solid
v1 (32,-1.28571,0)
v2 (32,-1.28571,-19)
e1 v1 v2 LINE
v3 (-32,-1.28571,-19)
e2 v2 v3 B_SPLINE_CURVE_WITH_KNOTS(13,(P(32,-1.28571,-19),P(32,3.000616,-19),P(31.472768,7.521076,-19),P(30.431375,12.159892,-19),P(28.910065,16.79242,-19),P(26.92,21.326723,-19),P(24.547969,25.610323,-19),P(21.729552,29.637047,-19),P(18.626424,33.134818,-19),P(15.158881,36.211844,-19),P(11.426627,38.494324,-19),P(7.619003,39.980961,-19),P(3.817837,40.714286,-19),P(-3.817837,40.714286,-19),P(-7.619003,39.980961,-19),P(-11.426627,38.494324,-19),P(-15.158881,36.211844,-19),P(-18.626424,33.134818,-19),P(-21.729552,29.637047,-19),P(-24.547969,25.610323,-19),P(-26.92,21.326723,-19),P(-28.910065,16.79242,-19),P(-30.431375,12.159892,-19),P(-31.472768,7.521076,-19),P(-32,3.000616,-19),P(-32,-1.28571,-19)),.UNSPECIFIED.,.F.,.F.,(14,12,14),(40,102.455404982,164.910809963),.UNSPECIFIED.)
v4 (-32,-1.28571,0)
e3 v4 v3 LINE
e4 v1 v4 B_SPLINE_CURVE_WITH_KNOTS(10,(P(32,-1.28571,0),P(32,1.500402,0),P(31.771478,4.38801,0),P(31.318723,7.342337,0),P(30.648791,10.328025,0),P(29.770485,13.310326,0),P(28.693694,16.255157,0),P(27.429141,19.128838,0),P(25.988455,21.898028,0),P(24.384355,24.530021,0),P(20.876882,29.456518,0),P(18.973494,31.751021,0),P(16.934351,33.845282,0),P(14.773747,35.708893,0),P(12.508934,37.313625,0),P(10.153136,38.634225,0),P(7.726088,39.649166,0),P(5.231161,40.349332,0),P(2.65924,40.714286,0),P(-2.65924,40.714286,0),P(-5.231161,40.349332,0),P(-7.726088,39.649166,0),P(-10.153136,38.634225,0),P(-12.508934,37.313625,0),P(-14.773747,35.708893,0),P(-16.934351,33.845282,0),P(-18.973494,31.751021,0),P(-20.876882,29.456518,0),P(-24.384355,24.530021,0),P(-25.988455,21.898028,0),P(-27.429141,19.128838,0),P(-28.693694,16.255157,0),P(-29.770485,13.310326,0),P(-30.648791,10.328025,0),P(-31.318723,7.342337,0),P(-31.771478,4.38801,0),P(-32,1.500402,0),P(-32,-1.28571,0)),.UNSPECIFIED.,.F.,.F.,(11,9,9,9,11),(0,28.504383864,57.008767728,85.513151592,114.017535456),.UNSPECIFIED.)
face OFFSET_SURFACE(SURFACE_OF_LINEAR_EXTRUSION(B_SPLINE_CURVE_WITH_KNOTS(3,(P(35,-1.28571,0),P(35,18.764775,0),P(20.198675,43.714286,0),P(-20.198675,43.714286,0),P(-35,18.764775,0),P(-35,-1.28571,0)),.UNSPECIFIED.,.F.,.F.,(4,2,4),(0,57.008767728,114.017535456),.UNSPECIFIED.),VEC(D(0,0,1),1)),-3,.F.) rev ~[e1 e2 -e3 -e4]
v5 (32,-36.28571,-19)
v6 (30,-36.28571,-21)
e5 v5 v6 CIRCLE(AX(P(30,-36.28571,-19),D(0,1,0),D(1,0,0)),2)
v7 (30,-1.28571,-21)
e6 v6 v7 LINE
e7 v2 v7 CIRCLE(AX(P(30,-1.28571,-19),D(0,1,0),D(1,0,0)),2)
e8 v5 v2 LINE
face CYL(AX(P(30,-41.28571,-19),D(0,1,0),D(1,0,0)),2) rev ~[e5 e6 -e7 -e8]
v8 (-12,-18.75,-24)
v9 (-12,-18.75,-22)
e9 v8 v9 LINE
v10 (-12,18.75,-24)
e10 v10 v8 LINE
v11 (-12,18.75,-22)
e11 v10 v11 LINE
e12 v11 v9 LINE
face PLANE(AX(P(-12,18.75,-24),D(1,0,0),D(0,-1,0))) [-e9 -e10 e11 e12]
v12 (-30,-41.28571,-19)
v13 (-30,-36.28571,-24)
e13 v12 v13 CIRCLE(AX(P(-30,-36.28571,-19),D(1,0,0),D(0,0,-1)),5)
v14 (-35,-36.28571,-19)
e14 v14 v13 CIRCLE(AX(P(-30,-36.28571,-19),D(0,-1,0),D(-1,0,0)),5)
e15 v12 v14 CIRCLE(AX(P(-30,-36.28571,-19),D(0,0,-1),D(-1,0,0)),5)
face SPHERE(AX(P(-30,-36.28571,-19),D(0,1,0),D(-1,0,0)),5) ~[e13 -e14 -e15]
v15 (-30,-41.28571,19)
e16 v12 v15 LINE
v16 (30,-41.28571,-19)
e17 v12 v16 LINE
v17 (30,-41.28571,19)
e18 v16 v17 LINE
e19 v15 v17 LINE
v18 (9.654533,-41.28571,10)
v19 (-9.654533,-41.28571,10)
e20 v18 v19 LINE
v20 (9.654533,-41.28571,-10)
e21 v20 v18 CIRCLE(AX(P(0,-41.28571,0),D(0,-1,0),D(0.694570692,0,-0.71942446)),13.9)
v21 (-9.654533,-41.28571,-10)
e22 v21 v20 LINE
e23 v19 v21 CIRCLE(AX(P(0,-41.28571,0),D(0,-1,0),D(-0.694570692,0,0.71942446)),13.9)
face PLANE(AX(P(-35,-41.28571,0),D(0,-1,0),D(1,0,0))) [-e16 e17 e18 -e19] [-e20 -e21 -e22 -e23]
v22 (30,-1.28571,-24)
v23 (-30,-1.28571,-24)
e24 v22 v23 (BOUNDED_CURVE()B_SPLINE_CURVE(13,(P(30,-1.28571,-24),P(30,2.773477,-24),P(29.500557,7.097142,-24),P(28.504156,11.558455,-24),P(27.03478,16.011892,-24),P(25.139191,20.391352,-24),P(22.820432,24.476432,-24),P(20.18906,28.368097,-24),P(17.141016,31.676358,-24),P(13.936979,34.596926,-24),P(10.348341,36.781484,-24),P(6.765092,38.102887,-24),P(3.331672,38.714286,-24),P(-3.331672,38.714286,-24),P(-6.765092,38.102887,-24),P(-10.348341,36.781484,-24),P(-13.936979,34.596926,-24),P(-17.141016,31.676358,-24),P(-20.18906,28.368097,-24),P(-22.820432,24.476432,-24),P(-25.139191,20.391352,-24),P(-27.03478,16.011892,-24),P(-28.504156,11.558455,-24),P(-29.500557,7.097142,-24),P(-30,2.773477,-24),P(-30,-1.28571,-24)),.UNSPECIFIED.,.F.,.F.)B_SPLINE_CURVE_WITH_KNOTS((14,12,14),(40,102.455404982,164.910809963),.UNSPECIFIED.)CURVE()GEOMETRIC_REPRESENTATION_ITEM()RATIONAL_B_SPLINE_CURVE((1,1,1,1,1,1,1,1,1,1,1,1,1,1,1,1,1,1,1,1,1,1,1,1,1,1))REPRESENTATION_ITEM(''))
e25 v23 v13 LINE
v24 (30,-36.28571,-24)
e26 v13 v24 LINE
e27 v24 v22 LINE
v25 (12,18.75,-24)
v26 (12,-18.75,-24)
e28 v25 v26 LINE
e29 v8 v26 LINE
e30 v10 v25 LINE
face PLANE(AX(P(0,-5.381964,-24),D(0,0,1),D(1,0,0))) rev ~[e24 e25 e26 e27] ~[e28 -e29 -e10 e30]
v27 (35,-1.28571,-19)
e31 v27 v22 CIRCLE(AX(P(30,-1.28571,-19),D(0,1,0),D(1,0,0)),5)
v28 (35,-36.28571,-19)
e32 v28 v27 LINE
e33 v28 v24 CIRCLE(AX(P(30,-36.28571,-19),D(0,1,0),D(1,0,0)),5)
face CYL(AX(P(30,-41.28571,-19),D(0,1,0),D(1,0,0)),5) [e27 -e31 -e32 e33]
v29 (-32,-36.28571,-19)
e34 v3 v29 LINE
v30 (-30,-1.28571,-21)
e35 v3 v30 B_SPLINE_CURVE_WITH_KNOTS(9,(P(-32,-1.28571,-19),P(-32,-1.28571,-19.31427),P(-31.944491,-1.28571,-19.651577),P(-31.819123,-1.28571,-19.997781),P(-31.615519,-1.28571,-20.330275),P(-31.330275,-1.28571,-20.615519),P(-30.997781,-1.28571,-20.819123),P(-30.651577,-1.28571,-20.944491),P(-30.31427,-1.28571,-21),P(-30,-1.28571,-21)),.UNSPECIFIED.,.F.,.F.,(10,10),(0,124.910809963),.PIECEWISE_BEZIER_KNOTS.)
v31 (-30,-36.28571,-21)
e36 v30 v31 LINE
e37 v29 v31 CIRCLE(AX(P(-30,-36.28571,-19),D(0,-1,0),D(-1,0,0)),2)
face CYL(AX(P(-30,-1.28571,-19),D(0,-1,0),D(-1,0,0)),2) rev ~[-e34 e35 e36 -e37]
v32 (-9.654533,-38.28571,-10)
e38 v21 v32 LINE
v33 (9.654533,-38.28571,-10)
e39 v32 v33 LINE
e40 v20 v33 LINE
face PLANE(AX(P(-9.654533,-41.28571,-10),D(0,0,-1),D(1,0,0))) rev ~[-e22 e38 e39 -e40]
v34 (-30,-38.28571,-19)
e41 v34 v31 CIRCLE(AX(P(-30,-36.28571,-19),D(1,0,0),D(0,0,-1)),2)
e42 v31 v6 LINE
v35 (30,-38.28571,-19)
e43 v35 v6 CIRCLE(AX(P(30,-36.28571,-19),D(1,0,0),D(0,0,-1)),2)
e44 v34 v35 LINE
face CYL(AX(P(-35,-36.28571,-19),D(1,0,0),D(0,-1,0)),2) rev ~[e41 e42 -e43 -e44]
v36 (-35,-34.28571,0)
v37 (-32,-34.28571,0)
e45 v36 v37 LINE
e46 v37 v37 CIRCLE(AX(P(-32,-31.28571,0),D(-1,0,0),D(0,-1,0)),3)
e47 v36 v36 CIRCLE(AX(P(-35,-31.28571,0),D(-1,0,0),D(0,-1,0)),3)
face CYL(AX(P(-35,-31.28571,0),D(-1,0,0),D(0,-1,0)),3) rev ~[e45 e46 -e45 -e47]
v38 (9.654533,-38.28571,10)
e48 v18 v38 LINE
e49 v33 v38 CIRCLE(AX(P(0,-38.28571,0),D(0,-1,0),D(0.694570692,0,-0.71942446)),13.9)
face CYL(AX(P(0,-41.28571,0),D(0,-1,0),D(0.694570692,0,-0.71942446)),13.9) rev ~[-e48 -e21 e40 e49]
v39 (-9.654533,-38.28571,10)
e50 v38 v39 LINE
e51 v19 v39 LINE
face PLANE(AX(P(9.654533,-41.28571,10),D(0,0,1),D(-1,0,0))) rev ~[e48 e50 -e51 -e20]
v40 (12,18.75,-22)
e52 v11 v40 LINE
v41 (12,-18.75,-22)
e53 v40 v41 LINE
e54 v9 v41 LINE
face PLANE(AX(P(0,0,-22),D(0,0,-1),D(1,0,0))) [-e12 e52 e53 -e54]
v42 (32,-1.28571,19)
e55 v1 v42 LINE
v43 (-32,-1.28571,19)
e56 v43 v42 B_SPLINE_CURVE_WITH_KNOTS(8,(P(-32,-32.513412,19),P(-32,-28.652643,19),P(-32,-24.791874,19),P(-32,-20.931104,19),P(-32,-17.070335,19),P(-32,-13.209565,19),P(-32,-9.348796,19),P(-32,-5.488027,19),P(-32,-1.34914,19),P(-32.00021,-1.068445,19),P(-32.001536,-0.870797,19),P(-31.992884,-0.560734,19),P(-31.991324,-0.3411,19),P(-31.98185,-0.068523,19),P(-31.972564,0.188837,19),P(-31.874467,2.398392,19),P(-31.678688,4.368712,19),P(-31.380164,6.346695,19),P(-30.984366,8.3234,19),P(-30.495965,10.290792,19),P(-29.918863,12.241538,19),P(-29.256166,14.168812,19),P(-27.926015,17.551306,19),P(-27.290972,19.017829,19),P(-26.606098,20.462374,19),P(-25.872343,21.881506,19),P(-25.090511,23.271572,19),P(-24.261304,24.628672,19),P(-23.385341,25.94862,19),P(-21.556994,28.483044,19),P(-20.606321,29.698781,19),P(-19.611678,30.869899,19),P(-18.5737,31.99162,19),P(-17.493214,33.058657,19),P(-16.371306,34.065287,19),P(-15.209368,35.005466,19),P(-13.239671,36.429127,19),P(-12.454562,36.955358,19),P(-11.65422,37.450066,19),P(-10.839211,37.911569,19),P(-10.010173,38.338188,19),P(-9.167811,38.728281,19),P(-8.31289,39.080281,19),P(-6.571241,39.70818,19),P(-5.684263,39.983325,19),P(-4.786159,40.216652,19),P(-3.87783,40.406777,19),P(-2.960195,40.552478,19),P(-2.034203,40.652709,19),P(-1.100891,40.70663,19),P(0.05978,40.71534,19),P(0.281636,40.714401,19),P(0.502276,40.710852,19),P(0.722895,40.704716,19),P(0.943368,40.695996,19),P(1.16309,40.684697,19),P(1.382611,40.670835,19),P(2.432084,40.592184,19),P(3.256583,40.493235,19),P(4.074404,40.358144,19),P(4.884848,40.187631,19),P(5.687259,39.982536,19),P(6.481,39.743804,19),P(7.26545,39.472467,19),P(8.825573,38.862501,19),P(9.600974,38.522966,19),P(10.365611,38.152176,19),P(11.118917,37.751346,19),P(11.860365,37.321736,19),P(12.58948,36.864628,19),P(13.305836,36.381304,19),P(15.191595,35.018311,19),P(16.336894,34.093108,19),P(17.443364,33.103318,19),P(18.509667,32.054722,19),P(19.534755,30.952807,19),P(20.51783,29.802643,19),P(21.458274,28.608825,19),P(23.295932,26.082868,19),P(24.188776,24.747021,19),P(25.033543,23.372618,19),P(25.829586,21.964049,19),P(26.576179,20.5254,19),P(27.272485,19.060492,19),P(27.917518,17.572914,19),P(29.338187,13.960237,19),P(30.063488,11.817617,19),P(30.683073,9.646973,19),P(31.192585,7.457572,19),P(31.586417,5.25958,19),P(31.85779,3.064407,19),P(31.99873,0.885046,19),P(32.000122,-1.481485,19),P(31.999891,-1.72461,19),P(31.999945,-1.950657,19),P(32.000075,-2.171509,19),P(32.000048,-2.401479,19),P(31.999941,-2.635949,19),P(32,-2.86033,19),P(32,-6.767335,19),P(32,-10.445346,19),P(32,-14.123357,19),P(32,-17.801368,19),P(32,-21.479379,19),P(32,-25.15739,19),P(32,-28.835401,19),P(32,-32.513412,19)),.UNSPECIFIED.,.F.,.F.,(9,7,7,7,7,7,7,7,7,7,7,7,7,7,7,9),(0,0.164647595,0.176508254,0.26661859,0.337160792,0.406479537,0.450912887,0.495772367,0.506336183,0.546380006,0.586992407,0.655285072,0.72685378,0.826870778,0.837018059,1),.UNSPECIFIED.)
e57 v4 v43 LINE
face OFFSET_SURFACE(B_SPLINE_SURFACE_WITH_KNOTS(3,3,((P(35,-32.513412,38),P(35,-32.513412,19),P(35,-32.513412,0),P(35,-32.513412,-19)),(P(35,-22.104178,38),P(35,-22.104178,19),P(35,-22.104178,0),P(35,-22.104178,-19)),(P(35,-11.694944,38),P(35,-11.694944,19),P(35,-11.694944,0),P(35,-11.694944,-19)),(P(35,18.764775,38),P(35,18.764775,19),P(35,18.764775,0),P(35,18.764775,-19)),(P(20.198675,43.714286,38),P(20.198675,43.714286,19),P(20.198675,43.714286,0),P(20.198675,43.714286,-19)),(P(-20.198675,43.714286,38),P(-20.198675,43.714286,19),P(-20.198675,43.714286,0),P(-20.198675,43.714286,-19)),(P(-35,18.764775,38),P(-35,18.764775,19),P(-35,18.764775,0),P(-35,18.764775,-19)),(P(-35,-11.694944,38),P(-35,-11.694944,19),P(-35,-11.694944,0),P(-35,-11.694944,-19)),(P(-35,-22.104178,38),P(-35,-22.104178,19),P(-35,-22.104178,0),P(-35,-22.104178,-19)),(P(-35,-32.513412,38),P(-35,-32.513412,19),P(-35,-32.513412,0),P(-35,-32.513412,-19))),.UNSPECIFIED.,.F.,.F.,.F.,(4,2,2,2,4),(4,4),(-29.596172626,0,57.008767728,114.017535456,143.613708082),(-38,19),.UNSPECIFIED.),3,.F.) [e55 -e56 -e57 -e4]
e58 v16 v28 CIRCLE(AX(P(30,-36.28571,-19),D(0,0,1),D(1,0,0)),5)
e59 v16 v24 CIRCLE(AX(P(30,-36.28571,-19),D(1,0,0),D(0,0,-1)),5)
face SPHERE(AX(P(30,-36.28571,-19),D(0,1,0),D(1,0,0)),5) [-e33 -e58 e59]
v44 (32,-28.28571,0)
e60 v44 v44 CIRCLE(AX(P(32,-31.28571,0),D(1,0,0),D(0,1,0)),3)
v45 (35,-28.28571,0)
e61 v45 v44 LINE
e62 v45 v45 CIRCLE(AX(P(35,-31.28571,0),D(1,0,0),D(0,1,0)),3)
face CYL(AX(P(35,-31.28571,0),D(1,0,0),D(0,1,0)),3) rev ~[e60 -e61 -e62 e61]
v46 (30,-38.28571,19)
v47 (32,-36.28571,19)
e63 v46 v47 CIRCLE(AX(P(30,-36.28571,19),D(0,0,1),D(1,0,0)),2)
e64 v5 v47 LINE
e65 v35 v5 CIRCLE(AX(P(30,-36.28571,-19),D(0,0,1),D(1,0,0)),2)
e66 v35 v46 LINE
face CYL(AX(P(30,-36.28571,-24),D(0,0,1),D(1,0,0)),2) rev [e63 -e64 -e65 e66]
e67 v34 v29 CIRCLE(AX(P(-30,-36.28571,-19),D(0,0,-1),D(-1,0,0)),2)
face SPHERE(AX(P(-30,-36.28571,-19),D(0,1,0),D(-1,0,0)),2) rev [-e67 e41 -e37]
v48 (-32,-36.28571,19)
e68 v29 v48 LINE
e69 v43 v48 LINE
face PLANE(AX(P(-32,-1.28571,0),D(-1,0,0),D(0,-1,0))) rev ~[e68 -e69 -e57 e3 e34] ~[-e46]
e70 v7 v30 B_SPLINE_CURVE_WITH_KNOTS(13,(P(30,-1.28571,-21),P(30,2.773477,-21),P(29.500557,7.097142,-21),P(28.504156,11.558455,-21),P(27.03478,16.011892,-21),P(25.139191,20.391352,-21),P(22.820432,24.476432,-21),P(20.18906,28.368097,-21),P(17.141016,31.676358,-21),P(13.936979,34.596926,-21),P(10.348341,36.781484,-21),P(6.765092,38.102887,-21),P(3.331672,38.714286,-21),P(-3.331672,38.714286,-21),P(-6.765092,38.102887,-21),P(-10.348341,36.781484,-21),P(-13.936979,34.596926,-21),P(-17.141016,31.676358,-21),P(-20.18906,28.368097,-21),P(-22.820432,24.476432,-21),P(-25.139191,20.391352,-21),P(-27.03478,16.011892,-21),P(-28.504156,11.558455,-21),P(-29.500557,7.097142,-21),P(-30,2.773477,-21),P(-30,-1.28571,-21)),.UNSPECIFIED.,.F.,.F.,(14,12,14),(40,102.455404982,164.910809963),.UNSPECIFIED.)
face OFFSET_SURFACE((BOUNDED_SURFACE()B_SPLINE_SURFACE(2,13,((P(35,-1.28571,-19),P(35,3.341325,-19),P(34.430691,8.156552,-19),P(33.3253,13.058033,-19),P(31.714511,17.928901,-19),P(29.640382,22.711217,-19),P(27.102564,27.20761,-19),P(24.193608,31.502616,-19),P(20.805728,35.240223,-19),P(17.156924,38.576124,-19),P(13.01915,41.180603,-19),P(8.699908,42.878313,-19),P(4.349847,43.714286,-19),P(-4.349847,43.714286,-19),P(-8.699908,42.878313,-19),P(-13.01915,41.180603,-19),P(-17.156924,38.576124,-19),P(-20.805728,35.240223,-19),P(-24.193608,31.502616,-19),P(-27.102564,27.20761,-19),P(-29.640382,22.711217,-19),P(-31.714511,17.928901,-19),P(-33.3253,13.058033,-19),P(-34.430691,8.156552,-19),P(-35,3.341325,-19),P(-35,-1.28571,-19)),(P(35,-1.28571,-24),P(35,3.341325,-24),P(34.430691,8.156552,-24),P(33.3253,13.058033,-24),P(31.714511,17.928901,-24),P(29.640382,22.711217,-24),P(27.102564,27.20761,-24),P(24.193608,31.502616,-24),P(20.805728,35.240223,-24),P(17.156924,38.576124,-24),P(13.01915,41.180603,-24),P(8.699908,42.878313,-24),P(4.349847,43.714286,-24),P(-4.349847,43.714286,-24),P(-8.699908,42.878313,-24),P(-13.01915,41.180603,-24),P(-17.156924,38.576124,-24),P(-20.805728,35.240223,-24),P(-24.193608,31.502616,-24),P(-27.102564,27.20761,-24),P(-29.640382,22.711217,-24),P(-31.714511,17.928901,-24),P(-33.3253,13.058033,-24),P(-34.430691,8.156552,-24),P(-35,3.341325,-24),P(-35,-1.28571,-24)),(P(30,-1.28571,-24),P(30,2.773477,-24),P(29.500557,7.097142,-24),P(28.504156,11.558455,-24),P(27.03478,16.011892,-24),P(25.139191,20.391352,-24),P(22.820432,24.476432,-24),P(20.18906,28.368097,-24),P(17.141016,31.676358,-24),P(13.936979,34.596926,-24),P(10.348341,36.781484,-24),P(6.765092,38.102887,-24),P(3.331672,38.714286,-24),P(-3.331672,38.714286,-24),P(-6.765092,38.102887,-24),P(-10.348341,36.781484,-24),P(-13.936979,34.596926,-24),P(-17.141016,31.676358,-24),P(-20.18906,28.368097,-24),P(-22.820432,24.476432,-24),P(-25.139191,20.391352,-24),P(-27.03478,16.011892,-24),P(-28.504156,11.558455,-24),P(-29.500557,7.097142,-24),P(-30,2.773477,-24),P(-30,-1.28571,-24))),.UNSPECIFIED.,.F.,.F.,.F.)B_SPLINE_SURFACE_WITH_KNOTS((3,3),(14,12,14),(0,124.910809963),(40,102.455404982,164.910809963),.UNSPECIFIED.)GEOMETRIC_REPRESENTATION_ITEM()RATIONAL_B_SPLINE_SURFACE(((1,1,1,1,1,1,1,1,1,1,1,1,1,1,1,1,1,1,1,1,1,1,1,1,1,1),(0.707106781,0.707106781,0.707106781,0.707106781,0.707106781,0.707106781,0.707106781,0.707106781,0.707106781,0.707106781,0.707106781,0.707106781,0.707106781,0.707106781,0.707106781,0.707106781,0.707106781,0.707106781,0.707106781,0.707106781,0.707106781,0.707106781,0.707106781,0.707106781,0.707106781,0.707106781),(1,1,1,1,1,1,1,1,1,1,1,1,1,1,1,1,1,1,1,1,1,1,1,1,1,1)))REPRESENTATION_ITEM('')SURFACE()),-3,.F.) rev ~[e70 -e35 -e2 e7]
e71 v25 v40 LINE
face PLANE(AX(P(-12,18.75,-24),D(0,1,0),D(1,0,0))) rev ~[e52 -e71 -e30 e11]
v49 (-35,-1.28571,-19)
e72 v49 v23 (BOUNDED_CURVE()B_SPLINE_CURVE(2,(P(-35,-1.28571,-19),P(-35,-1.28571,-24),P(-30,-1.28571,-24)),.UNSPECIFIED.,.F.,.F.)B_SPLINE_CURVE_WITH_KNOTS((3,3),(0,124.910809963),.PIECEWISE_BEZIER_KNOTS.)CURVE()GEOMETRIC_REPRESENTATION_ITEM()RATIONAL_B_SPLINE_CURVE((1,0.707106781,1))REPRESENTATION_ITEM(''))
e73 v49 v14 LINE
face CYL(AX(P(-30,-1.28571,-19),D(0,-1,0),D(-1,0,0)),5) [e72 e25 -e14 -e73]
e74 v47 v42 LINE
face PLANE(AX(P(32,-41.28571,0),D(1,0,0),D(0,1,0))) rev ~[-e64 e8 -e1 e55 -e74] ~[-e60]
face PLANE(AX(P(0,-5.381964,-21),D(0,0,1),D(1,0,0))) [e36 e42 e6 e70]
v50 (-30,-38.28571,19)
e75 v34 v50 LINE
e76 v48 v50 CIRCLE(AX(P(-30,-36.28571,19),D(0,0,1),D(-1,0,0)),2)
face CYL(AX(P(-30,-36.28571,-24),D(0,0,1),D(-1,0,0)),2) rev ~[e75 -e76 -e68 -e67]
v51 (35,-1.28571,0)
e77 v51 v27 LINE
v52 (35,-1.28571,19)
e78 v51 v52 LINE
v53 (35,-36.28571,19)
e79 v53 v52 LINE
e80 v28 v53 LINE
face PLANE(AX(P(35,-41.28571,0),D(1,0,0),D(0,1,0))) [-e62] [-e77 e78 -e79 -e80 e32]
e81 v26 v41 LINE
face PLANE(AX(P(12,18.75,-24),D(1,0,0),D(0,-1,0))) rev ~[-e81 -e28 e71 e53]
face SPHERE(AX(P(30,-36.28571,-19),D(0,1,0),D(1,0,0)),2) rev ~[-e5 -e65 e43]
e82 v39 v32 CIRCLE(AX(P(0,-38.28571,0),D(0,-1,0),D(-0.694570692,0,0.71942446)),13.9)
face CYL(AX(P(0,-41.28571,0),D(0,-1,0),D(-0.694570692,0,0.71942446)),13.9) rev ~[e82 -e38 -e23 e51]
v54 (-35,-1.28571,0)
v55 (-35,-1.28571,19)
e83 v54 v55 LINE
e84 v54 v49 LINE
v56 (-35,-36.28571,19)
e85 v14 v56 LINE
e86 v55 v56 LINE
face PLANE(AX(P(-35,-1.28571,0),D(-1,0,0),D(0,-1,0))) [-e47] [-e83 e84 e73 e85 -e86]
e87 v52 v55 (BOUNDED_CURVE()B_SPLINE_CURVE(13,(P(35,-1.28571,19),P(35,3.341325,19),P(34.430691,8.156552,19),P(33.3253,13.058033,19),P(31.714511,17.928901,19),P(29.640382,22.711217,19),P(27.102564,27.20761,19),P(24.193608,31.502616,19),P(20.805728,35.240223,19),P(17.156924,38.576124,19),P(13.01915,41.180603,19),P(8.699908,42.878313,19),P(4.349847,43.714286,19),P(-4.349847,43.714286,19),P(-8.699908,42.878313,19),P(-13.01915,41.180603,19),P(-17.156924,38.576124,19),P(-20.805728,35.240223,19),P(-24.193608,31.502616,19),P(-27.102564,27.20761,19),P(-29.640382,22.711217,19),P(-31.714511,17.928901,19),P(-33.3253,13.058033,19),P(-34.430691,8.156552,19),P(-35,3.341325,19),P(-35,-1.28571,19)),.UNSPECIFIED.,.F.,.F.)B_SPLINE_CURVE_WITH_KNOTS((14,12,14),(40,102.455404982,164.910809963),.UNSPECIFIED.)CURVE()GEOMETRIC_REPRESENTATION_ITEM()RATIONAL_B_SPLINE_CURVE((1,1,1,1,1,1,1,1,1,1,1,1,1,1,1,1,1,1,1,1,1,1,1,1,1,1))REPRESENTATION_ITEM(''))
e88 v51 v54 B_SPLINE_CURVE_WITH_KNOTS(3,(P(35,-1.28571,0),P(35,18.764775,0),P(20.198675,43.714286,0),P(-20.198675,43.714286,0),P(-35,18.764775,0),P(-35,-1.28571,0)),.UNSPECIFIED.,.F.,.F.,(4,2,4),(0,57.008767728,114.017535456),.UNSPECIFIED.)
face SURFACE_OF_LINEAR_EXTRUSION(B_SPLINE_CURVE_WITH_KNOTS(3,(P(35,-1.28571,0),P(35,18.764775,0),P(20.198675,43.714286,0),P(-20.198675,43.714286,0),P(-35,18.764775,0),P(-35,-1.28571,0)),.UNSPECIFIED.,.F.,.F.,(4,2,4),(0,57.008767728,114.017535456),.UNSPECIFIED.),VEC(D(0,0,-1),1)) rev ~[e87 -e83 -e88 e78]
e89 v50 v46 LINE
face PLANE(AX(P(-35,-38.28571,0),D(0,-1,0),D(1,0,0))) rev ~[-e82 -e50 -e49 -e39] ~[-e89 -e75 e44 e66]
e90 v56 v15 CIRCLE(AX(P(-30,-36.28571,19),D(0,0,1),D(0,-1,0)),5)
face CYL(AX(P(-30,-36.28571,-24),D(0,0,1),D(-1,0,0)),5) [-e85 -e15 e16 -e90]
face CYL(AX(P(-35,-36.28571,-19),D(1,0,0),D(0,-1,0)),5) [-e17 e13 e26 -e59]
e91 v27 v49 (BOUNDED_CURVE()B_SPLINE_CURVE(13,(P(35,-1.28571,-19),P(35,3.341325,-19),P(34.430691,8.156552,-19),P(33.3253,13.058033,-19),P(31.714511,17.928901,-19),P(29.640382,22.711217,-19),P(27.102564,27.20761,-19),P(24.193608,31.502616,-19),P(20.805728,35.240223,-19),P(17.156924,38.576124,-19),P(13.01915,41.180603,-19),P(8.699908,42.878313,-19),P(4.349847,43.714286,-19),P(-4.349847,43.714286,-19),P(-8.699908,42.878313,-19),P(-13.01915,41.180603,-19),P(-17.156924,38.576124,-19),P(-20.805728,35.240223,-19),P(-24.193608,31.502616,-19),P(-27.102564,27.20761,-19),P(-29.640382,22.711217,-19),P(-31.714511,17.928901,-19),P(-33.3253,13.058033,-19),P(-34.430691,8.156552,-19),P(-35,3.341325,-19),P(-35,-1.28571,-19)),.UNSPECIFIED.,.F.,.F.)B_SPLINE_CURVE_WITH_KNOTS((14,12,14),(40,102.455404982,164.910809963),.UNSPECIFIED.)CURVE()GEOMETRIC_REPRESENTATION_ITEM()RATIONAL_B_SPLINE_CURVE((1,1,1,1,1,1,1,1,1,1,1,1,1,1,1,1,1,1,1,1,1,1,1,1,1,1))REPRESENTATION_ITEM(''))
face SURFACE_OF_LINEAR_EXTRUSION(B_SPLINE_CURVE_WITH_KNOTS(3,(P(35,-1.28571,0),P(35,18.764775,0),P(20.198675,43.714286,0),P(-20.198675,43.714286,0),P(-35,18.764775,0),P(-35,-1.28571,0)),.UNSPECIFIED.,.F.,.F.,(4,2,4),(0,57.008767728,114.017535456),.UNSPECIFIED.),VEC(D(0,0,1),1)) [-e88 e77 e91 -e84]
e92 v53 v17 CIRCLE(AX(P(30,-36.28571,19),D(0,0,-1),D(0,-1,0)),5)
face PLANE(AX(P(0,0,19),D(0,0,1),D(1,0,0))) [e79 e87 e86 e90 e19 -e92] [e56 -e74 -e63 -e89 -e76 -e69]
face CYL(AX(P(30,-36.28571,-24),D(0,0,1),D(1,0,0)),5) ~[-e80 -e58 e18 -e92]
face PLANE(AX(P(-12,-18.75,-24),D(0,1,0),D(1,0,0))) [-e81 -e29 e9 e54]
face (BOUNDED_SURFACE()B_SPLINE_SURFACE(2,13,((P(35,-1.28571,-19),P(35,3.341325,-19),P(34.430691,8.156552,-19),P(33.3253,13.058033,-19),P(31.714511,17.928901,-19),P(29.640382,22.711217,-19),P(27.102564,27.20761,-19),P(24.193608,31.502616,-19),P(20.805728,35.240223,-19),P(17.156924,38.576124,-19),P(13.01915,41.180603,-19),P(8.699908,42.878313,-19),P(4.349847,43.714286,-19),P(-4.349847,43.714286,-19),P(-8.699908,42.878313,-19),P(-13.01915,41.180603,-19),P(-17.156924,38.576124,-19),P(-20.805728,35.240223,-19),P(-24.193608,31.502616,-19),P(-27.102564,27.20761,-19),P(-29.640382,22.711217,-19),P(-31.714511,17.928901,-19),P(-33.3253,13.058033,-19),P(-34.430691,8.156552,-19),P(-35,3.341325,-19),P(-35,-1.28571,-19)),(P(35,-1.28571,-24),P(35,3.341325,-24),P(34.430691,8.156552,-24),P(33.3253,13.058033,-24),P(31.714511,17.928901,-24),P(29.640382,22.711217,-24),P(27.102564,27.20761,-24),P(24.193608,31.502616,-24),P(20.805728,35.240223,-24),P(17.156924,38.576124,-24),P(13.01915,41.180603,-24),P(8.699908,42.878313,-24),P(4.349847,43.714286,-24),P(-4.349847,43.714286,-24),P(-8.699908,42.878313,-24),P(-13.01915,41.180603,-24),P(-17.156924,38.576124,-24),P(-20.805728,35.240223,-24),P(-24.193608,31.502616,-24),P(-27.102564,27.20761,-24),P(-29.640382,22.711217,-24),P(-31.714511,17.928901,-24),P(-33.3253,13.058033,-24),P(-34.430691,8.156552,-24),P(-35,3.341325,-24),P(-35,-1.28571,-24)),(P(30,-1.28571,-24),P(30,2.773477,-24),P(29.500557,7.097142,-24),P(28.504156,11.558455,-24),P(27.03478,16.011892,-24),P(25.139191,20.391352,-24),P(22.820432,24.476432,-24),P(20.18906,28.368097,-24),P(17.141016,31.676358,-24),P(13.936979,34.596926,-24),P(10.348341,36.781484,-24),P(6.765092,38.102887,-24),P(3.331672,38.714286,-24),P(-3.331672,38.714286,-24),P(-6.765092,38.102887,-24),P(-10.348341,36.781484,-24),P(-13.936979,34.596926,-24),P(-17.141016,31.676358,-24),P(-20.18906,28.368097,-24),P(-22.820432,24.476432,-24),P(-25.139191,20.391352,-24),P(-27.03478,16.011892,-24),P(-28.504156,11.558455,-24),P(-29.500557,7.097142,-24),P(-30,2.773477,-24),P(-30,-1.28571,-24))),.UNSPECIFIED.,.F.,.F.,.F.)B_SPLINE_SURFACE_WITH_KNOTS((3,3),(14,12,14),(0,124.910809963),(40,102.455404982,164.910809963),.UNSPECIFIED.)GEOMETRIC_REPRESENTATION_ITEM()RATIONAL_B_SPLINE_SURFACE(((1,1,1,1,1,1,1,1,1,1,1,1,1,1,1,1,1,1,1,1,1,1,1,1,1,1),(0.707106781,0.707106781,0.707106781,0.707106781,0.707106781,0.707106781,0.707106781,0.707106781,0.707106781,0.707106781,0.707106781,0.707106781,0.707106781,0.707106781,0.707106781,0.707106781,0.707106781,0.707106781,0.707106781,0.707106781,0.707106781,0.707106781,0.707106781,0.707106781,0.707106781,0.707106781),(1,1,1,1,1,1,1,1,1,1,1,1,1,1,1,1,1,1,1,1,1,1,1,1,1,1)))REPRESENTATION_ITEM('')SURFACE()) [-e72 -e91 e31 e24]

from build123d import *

# Parameters (mm, degrees)
F1_DEPTH  = 24
F4_R      = 5
F5_W      = 91.2617743015
F5_H      = 146.8465328217
F6_DEPTH  = 5
F7_T      = -3
F9_W      = 24
F9_H      = 37.5
F10_DEPTH = 2
F11_DEPTH = 3
F13_R     = 3
F15_DEPTH = 3
F14_R     = 3
F16_DEPTH = 3


with BuildPart() as f1:
    # F0 (on Top) → F1 (new body, symmetric)
    with BuildSketch(Plane.XY):
        with BuildLine():
            Line((-35, -1.2857098173), (-35, -41.2857098173))
            Line((-35, -41.2857098173), (35, -41.2857098173))
            Line((35, -41.2857098173), (35, -1.2857098173))
            add(Edge.make_bspline(
                [(0, 43.7142857143), (20.1986748725, 43.7142857143), (35, 18.7647750933), (35, -1.2857098173)],
                knots=[0, 0, 0, 0, 57.0087677278, 57.0087677278, 57.0087677278, 57.0087677278], degree=3))
            add(Edge.make_bspline(
                [(0, 43.7142857143), (-20.1986748725, 43.7142857143), (-35, 18.7647750933), (-35, -1.2857098173)],
                knots=[0, 0, 0, 0, 57.0087677278, 57.0087677278, 57.0087677278, 57.0087677278], degree=3))
        make_face()
    extrude(amount=F1_DEPTH, both=True)

    # F4
    f4_edges = [f1.edges().sort_by_distance(p)[0] for p in [
        (-35, -21.28571, -24),
        (-25.571688, 28.021772, -24),
        (0, -41.28571, 24),
        (-35, -21.28571, 24),
        (-35, -41.28571, 0),
        (35, -41.28571, 0),
        (0, -41.28571, -24),
    ]]
    fillet(f4_edges, radius=F4_R)

    # F5 (on face) → F6 (cut)
    with BuildSketch(Plane.XY.offset(24)):
        Rectangle(F5_W, F5_H)
    extrude(amount=-F6_DEPTH, mode=Mode.SUBTRACT)

    # F7
    f7_openings = [f1.faces().sort_by_distance(p)[0] for p in [
        (0, -3.179771, 19),
    ]]
    offset(amount=F7_T, openings=f7_openings, kind=Kind.INTERSECTION)

    # F9 (on face) → F10 (cut)
    with BuildSketch(Plane(origin=(0, 0, -24), x_dir=(1, 0, 0), z_dir=(0, 0, -1))):
        Rectangle(F9_W, F9_H)
    extrude(amount=-F10_DEPTH, mode=Mode.SUBTRACT)

    # F8 (on face) → F11 (cut)
    with BuildSketch(Plane.XZ.offset(41.2857098173)):
        with BuildLine():
            Line((9.6545326143, 10), (0, 10))
            Line((0, 10), (0, 0))
            Line((0, 0), (0, -10))
            Line((0, -10), (9.6545326143, -10))
            ThreePointArc((9.6545326143, -10), (13.9, 0), (9.6545326143, 10))
        make_face()
        with BuildLine():
            Line((0, 10), (-9.6545326143, 10))
            ThreePointArc((-9.6545326143, 10), (-13.9, 0), (-9.6545326143, -10))
            Line((-9.6545326143, -10), (0, -10))
            Line((0, -10), (0, 0))
            Line((0, 0), (0, 10))
        make_face()
    extrude(amount=-F11_DEPTH, mode=Mode.SUBTRACT)

    # F13 (on face) → F15 (cut)
    with BuildSketch(Plane(origin=(-35, 0, 0), x_dir=(0, -1, 0), z_dir=(-1, 0, 0))):
        with Locations((31.2857098173, 0)):
            Circle(F13_R)
    extrude(amount=-F15_DEPTH, mode=Mode.SUBTRACT)

    # F14 (on face) → F16 (cut)
    with BuildSketch(Plane.YZ.offset(35)):
        with Locations((-31.2857098173, 0)):
            Circle(F14_R)
    extrude(amount=-F16_DEPTH, mode=Mode.SUBTRACT)


solid = f1.part
